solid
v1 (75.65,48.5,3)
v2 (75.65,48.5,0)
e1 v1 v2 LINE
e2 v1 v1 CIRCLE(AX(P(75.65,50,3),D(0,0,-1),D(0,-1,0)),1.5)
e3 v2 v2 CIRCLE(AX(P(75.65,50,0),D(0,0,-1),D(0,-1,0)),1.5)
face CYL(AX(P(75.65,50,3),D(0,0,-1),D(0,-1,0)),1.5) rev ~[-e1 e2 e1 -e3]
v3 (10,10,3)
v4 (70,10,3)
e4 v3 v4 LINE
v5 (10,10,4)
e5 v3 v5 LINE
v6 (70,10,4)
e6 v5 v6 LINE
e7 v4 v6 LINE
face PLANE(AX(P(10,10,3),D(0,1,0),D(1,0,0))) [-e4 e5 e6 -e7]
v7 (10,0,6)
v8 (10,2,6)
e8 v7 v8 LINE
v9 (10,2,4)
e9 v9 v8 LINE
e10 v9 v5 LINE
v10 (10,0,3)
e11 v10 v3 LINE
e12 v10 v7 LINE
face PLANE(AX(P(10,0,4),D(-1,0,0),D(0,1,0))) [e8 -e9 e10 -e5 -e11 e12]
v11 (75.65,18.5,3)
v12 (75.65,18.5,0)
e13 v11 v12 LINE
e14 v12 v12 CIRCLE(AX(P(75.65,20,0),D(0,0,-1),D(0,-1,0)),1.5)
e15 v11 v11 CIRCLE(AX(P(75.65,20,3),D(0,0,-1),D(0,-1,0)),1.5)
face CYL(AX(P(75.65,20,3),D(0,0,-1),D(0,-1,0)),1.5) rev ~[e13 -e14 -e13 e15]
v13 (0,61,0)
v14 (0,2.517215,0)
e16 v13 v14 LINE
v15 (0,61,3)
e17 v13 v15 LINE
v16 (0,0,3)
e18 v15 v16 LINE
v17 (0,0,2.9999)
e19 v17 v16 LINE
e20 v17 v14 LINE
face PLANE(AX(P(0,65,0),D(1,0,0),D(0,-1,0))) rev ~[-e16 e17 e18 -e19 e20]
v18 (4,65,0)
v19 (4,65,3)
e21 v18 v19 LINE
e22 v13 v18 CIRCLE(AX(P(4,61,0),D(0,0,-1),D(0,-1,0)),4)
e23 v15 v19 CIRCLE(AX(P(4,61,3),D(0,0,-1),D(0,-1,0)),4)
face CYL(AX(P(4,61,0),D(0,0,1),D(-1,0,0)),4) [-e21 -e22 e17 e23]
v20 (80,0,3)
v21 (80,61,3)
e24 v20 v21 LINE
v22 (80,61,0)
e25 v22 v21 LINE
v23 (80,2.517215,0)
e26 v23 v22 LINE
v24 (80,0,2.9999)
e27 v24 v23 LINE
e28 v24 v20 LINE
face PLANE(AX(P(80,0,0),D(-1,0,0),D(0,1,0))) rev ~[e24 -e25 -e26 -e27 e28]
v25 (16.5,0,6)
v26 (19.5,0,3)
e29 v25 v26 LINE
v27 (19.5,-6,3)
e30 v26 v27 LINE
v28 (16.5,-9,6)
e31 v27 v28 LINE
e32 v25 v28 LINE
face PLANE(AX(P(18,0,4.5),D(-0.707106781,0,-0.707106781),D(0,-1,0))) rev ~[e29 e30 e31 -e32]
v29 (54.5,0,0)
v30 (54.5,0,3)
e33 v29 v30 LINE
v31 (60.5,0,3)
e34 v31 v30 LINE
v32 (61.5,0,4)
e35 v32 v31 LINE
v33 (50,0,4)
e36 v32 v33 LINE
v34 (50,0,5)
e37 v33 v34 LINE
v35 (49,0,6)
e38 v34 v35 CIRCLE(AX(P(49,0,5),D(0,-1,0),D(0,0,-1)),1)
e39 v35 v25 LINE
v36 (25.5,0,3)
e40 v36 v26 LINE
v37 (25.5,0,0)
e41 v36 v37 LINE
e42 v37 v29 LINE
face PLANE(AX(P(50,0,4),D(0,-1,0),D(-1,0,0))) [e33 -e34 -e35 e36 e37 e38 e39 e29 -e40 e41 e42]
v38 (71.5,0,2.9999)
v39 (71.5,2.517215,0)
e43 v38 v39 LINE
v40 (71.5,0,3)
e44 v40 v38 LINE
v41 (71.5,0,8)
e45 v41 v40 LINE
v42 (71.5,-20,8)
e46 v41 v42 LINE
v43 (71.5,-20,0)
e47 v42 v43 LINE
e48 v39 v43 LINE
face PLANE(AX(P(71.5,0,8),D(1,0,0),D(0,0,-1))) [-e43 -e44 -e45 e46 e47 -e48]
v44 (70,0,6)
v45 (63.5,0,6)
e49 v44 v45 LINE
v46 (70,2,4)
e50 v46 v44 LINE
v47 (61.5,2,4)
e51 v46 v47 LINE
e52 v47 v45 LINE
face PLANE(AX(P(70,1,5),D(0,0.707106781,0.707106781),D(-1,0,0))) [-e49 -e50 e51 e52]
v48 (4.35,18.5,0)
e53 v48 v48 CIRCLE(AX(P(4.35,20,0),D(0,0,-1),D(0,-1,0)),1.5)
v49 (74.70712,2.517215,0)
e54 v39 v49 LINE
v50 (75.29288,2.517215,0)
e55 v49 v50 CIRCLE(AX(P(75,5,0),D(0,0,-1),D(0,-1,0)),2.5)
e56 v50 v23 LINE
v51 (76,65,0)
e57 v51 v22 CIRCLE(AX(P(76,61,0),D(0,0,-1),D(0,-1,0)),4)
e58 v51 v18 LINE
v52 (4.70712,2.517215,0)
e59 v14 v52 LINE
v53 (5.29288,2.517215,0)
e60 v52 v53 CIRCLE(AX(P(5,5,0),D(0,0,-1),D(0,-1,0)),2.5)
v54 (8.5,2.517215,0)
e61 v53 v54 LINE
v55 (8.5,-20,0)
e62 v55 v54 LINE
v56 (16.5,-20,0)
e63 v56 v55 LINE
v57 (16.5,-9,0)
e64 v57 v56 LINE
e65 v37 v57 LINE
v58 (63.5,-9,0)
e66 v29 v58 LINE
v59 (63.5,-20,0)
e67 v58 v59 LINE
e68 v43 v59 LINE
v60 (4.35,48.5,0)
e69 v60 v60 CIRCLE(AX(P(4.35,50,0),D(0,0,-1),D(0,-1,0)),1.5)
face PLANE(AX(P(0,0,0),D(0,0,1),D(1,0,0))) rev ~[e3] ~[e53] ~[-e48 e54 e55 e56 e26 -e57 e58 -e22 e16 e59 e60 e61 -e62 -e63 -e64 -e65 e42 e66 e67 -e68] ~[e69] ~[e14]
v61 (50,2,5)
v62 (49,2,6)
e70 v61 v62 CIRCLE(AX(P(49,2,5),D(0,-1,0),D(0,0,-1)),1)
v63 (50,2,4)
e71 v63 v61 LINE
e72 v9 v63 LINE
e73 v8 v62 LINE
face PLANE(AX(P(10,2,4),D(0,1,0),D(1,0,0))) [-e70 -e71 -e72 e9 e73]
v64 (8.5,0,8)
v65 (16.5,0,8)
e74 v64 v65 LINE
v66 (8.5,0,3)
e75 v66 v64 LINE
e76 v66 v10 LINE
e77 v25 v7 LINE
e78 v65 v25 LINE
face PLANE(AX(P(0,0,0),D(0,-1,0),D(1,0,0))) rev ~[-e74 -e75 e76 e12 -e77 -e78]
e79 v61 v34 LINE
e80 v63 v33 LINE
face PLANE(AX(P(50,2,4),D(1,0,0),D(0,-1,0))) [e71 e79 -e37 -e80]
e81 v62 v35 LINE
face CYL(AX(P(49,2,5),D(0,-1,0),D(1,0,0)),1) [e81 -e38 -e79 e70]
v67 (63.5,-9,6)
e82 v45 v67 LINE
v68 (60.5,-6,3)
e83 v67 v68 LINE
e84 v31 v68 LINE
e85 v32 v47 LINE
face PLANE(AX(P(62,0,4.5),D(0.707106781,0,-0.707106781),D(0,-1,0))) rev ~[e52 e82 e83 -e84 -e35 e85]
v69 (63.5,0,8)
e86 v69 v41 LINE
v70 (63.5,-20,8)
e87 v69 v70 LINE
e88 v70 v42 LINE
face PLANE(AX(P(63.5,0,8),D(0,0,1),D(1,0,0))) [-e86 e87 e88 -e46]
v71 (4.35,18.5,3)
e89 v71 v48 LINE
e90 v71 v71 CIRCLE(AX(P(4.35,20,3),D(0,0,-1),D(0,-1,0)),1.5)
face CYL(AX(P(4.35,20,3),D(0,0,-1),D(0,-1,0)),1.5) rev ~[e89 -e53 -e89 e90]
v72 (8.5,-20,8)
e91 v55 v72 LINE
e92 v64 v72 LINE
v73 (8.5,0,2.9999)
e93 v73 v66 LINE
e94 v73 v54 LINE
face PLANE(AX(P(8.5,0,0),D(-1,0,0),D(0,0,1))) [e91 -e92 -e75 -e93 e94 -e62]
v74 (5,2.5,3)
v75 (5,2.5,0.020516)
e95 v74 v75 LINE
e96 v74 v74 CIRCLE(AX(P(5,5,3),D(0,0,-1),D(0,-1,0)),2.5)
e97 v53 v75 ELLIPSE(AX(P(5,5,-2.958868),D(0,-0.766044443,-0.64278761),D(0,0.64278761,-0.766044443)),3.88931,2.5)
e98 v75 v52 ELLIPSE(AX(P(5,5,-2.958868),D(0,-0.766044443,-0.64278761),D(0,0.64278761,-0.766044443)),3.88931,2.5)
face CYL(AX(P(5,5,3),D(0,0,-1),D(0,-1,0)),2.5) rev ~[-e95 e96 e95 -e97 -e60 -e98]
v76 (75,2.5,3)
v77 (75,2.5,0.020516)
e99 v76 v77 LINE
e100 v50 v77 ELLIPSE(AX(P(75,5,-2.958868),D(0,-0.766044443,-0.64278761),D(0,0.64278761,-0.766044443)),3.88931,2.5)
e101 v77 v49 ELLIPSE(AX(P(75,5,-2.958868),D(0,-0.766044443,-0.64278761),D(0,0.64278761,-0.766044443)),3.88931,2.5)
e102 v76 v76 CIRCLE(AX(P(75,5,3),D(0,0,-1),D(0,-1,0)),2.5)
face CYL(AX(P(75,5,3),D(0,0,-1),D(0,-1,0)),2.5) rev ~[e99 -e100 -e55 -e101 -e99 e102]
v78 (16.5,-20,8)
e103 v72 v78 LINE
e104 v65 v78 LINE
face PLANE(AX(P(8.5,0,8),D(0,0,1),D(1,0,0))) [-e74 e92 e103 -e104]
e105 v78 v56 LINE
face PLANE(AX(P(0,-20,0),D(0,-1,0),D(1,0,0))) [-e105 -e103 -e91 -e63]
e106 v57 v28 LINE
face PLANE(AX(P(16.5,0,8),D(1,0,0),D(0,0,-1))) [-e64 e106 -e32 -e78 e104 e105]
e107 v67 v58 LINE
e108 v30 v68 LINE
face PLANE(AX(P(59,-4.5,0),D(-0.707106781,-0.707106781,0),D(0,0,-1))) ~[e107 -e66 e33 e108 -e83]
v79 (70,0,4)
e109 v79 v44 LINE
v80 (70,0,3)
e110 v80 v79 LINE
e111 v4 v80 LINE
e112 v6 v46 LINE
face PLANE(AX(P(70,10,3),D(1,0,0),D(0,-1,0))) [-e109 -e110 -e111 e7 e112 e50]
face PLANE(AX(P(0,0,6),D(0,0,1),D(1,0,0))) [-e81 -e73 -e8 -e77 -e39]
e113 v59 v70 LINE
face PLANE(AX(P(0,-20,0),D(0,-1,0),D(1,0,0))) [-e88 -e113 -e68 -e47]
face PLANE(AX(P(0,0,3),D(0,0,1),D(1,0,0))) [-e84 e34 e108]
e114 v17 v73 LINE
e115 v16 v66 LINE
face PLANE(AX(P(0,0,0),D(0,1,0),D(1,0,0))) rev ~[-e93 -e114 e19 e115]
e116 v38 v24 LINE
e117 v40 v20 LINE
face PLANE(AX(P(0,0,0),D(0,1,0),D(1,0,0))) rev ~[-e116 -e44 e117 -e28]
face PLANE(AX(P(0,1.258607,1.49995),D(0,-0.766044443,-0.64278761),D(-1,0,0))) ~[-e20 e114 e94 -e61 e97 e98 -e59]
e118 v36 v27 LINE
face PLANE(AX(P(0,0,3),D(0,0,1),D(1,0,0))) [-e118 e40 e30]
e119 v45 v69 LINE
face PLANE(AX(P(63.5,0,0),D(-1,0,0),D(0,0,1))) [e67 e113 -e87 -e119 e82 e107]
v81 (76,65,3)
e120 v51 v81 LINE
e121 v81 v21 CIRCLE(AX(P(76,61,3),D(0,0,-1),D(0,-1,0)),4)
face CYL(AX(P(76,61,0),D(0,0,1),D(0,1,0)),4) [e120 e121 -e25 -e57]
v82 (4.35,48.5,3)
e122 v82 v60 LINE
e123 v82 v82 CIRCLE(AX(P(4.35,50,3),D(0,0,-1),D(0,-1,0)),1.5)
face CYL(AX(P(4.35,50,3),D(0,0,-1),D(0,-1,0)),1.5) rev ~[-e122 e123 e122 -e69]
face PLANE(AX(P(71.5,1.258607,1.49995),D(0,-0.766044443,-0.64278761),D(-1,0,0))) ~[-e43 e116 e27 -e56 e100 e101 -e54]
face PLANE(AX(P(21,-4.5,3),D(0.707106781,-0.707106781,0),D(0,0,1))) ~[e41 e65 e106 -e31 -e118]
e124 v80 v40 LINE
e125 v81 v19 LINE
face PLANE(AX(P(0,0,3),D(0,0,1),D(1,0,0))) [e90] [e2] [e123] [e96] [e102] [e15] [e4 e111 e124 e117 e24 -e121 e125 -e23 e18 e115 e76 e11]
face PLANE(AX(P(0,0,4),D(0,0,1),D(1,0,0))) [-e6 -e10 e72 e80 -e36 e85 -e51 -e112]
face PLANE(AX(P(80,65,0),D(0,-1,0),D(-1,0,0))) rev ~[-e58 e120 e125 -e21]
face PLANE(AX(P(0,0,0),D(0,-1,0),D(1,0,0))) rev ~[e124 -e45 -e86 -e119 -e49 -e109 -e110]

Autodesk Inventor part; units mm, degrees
ref_plane "YZ Plane" through (0, 0, 0) normal (1, 0, 0) x (0, 1, 0)
ref_plane "XZ Plane" through (0, 0, 0) normal (0, 1, 0) x (-1, 0, 0)
ref_plane "XY Plane" through (0, 0, 0) normal (0, 0, 1) x (1, 0, 0)
sketch "Skizze1" plane through (0, 0, 0) normal (0, 0, 1) x (1, 0, 0)
  line L0 (0, 0) -> (80, 0)
  line L1 (80, 0) -> (80, 65)
  line L2 (80, 65) -> (0, 65)
  line L3 (0, 65) -> (0, 0)
  dimension "d0" = 80
  dimension "d1" = 65
extrude "Extrusion2" add sketch "Skizze1" along normal blind 3
sketch "Skizze5" plane through (0, 0, 0) normal (0, -1, 0) x (1, 0, 0)
  line L0 (0, 0) -> (0, 3) projected
  line L1 (8.5, 8) -> (16.5, 8)
  line L2 (16.5, 8) -> (16.5, 0)
  line L3 (16.5, 0) -> (8.5, 0)
  line L4 (8.5, 0) -> (8.5, 8)
  line L5 (63.5, 8) -> (71.5, 8)
  line L6 (71.5, 8) -> (71.5, 0)
  line L7 (71.5, 0) -> (63.5, 0)
  line L8 (63.5, 0) -> (63.5, 8)
  line L9 (0, 0) -> (80, 0) projected
  dimension "d105" = 8
  dimension "d108" = 63
  dimension "d109" = 8.5
  dimension "d112" = 8
extrude "Extrusion5" add sketch "Skizze5" along normal blind 20
chamfer "Fase3" distance 9 angle 45 1 edges at (16.5, 0, 1.5)
chamfer "Fase4" distance 9 angle 45 1 edges at (63.5, 0, 1.5)
chamfer "Fase5" distance 3 angle 45 1 edges at (63.5, -4.5, 3)
chamfer "Fase6" distance 3 angle 45 1 edges at (16.5, -4.5, 3)
fillet "Rundung17" radius 4 2 edges at (0, 65, 1.5) (80, 65, 1.5)
sketch "Skizze13" plane through (0, 0, 3) normal (0, 0, 1) x (1, 0, 0)
  line L0 (10, 10) -> (70, 10)
  line L1 (70, 10) -> (70, 0)
  line L2 (70, 0) -> (10, 0)
  line L3 (10, 0) -> (10, 10)
  line L4 (0, 0) -> (8.5, 0) projected
  line L5 (80, 0) -> (80, 61) projected
  dimension "d0" = 80
  dimension "d257" = 60
  dimension "d258" = 10
  dimension "d259" = 10
extrude "Extrusion13" add sketch "Skizze13" along normal blind 1
sketch "Skizze15" plane through (0, 0, 4) normal (0, 0, 1) x (1, 0, 0)
  line L0 (10, 2) -> (50, 2)
  line L1 (50, 2) -> (50, 0)
  line L2 (50, 0) -> (10, 0)
  line L3 (10, 0) -> (10, 2)
  line L4 (0, 61) -> (0, 0) projected
  line L5 (0, 0) -> (8.5, 0) projected
  dimension "d189" = 40
  dimension "d190" = 2
  dimension "d191" = 10
extrude "Extrusion15" add sketch "Skizze15" along normal blind 2
fillet "Rundung19" radius 1 1 edges at (50, 1, 6)
chamfer "Fase13" distance 2.9999 angle 40 1 edges at (75.75, 0, 0) measured on face at (77.1667, 0, 2)
chamfer "Fase14" distance 2.9999 angle 40 1 edges at (4.25, 0, 0) measured on face at (2.8333, 0, 1)
hole "Bohrung5" at (5, 5, 3) direction (0, 0, -1) diameter 5 end through all
hole "Bohrung6" at (75, 5, 3) direction (0, 0, -1) diameter 5 end through all
hole "Bohrung7" at (4.35, 20, 3) direction (0, 0, -1) diameter 3 end through all
hole "Bohrung8" at (4.35, 50, 3) direction (0, 0, -1) diameter 3 end through all
hole "Bohrung9" at (75.65, 20, 3) direction (0, 0, -1) diameter 3 end through all
hole "Bohrung10" at (75.65, 50, 3) direction (0, 0, -1) diameter 3 end through all
chamfer "Fase16" distance 2 angle 45 1 edges at (65.75, 0, 4)
properties part number "Grundplatte_zerlegt"
